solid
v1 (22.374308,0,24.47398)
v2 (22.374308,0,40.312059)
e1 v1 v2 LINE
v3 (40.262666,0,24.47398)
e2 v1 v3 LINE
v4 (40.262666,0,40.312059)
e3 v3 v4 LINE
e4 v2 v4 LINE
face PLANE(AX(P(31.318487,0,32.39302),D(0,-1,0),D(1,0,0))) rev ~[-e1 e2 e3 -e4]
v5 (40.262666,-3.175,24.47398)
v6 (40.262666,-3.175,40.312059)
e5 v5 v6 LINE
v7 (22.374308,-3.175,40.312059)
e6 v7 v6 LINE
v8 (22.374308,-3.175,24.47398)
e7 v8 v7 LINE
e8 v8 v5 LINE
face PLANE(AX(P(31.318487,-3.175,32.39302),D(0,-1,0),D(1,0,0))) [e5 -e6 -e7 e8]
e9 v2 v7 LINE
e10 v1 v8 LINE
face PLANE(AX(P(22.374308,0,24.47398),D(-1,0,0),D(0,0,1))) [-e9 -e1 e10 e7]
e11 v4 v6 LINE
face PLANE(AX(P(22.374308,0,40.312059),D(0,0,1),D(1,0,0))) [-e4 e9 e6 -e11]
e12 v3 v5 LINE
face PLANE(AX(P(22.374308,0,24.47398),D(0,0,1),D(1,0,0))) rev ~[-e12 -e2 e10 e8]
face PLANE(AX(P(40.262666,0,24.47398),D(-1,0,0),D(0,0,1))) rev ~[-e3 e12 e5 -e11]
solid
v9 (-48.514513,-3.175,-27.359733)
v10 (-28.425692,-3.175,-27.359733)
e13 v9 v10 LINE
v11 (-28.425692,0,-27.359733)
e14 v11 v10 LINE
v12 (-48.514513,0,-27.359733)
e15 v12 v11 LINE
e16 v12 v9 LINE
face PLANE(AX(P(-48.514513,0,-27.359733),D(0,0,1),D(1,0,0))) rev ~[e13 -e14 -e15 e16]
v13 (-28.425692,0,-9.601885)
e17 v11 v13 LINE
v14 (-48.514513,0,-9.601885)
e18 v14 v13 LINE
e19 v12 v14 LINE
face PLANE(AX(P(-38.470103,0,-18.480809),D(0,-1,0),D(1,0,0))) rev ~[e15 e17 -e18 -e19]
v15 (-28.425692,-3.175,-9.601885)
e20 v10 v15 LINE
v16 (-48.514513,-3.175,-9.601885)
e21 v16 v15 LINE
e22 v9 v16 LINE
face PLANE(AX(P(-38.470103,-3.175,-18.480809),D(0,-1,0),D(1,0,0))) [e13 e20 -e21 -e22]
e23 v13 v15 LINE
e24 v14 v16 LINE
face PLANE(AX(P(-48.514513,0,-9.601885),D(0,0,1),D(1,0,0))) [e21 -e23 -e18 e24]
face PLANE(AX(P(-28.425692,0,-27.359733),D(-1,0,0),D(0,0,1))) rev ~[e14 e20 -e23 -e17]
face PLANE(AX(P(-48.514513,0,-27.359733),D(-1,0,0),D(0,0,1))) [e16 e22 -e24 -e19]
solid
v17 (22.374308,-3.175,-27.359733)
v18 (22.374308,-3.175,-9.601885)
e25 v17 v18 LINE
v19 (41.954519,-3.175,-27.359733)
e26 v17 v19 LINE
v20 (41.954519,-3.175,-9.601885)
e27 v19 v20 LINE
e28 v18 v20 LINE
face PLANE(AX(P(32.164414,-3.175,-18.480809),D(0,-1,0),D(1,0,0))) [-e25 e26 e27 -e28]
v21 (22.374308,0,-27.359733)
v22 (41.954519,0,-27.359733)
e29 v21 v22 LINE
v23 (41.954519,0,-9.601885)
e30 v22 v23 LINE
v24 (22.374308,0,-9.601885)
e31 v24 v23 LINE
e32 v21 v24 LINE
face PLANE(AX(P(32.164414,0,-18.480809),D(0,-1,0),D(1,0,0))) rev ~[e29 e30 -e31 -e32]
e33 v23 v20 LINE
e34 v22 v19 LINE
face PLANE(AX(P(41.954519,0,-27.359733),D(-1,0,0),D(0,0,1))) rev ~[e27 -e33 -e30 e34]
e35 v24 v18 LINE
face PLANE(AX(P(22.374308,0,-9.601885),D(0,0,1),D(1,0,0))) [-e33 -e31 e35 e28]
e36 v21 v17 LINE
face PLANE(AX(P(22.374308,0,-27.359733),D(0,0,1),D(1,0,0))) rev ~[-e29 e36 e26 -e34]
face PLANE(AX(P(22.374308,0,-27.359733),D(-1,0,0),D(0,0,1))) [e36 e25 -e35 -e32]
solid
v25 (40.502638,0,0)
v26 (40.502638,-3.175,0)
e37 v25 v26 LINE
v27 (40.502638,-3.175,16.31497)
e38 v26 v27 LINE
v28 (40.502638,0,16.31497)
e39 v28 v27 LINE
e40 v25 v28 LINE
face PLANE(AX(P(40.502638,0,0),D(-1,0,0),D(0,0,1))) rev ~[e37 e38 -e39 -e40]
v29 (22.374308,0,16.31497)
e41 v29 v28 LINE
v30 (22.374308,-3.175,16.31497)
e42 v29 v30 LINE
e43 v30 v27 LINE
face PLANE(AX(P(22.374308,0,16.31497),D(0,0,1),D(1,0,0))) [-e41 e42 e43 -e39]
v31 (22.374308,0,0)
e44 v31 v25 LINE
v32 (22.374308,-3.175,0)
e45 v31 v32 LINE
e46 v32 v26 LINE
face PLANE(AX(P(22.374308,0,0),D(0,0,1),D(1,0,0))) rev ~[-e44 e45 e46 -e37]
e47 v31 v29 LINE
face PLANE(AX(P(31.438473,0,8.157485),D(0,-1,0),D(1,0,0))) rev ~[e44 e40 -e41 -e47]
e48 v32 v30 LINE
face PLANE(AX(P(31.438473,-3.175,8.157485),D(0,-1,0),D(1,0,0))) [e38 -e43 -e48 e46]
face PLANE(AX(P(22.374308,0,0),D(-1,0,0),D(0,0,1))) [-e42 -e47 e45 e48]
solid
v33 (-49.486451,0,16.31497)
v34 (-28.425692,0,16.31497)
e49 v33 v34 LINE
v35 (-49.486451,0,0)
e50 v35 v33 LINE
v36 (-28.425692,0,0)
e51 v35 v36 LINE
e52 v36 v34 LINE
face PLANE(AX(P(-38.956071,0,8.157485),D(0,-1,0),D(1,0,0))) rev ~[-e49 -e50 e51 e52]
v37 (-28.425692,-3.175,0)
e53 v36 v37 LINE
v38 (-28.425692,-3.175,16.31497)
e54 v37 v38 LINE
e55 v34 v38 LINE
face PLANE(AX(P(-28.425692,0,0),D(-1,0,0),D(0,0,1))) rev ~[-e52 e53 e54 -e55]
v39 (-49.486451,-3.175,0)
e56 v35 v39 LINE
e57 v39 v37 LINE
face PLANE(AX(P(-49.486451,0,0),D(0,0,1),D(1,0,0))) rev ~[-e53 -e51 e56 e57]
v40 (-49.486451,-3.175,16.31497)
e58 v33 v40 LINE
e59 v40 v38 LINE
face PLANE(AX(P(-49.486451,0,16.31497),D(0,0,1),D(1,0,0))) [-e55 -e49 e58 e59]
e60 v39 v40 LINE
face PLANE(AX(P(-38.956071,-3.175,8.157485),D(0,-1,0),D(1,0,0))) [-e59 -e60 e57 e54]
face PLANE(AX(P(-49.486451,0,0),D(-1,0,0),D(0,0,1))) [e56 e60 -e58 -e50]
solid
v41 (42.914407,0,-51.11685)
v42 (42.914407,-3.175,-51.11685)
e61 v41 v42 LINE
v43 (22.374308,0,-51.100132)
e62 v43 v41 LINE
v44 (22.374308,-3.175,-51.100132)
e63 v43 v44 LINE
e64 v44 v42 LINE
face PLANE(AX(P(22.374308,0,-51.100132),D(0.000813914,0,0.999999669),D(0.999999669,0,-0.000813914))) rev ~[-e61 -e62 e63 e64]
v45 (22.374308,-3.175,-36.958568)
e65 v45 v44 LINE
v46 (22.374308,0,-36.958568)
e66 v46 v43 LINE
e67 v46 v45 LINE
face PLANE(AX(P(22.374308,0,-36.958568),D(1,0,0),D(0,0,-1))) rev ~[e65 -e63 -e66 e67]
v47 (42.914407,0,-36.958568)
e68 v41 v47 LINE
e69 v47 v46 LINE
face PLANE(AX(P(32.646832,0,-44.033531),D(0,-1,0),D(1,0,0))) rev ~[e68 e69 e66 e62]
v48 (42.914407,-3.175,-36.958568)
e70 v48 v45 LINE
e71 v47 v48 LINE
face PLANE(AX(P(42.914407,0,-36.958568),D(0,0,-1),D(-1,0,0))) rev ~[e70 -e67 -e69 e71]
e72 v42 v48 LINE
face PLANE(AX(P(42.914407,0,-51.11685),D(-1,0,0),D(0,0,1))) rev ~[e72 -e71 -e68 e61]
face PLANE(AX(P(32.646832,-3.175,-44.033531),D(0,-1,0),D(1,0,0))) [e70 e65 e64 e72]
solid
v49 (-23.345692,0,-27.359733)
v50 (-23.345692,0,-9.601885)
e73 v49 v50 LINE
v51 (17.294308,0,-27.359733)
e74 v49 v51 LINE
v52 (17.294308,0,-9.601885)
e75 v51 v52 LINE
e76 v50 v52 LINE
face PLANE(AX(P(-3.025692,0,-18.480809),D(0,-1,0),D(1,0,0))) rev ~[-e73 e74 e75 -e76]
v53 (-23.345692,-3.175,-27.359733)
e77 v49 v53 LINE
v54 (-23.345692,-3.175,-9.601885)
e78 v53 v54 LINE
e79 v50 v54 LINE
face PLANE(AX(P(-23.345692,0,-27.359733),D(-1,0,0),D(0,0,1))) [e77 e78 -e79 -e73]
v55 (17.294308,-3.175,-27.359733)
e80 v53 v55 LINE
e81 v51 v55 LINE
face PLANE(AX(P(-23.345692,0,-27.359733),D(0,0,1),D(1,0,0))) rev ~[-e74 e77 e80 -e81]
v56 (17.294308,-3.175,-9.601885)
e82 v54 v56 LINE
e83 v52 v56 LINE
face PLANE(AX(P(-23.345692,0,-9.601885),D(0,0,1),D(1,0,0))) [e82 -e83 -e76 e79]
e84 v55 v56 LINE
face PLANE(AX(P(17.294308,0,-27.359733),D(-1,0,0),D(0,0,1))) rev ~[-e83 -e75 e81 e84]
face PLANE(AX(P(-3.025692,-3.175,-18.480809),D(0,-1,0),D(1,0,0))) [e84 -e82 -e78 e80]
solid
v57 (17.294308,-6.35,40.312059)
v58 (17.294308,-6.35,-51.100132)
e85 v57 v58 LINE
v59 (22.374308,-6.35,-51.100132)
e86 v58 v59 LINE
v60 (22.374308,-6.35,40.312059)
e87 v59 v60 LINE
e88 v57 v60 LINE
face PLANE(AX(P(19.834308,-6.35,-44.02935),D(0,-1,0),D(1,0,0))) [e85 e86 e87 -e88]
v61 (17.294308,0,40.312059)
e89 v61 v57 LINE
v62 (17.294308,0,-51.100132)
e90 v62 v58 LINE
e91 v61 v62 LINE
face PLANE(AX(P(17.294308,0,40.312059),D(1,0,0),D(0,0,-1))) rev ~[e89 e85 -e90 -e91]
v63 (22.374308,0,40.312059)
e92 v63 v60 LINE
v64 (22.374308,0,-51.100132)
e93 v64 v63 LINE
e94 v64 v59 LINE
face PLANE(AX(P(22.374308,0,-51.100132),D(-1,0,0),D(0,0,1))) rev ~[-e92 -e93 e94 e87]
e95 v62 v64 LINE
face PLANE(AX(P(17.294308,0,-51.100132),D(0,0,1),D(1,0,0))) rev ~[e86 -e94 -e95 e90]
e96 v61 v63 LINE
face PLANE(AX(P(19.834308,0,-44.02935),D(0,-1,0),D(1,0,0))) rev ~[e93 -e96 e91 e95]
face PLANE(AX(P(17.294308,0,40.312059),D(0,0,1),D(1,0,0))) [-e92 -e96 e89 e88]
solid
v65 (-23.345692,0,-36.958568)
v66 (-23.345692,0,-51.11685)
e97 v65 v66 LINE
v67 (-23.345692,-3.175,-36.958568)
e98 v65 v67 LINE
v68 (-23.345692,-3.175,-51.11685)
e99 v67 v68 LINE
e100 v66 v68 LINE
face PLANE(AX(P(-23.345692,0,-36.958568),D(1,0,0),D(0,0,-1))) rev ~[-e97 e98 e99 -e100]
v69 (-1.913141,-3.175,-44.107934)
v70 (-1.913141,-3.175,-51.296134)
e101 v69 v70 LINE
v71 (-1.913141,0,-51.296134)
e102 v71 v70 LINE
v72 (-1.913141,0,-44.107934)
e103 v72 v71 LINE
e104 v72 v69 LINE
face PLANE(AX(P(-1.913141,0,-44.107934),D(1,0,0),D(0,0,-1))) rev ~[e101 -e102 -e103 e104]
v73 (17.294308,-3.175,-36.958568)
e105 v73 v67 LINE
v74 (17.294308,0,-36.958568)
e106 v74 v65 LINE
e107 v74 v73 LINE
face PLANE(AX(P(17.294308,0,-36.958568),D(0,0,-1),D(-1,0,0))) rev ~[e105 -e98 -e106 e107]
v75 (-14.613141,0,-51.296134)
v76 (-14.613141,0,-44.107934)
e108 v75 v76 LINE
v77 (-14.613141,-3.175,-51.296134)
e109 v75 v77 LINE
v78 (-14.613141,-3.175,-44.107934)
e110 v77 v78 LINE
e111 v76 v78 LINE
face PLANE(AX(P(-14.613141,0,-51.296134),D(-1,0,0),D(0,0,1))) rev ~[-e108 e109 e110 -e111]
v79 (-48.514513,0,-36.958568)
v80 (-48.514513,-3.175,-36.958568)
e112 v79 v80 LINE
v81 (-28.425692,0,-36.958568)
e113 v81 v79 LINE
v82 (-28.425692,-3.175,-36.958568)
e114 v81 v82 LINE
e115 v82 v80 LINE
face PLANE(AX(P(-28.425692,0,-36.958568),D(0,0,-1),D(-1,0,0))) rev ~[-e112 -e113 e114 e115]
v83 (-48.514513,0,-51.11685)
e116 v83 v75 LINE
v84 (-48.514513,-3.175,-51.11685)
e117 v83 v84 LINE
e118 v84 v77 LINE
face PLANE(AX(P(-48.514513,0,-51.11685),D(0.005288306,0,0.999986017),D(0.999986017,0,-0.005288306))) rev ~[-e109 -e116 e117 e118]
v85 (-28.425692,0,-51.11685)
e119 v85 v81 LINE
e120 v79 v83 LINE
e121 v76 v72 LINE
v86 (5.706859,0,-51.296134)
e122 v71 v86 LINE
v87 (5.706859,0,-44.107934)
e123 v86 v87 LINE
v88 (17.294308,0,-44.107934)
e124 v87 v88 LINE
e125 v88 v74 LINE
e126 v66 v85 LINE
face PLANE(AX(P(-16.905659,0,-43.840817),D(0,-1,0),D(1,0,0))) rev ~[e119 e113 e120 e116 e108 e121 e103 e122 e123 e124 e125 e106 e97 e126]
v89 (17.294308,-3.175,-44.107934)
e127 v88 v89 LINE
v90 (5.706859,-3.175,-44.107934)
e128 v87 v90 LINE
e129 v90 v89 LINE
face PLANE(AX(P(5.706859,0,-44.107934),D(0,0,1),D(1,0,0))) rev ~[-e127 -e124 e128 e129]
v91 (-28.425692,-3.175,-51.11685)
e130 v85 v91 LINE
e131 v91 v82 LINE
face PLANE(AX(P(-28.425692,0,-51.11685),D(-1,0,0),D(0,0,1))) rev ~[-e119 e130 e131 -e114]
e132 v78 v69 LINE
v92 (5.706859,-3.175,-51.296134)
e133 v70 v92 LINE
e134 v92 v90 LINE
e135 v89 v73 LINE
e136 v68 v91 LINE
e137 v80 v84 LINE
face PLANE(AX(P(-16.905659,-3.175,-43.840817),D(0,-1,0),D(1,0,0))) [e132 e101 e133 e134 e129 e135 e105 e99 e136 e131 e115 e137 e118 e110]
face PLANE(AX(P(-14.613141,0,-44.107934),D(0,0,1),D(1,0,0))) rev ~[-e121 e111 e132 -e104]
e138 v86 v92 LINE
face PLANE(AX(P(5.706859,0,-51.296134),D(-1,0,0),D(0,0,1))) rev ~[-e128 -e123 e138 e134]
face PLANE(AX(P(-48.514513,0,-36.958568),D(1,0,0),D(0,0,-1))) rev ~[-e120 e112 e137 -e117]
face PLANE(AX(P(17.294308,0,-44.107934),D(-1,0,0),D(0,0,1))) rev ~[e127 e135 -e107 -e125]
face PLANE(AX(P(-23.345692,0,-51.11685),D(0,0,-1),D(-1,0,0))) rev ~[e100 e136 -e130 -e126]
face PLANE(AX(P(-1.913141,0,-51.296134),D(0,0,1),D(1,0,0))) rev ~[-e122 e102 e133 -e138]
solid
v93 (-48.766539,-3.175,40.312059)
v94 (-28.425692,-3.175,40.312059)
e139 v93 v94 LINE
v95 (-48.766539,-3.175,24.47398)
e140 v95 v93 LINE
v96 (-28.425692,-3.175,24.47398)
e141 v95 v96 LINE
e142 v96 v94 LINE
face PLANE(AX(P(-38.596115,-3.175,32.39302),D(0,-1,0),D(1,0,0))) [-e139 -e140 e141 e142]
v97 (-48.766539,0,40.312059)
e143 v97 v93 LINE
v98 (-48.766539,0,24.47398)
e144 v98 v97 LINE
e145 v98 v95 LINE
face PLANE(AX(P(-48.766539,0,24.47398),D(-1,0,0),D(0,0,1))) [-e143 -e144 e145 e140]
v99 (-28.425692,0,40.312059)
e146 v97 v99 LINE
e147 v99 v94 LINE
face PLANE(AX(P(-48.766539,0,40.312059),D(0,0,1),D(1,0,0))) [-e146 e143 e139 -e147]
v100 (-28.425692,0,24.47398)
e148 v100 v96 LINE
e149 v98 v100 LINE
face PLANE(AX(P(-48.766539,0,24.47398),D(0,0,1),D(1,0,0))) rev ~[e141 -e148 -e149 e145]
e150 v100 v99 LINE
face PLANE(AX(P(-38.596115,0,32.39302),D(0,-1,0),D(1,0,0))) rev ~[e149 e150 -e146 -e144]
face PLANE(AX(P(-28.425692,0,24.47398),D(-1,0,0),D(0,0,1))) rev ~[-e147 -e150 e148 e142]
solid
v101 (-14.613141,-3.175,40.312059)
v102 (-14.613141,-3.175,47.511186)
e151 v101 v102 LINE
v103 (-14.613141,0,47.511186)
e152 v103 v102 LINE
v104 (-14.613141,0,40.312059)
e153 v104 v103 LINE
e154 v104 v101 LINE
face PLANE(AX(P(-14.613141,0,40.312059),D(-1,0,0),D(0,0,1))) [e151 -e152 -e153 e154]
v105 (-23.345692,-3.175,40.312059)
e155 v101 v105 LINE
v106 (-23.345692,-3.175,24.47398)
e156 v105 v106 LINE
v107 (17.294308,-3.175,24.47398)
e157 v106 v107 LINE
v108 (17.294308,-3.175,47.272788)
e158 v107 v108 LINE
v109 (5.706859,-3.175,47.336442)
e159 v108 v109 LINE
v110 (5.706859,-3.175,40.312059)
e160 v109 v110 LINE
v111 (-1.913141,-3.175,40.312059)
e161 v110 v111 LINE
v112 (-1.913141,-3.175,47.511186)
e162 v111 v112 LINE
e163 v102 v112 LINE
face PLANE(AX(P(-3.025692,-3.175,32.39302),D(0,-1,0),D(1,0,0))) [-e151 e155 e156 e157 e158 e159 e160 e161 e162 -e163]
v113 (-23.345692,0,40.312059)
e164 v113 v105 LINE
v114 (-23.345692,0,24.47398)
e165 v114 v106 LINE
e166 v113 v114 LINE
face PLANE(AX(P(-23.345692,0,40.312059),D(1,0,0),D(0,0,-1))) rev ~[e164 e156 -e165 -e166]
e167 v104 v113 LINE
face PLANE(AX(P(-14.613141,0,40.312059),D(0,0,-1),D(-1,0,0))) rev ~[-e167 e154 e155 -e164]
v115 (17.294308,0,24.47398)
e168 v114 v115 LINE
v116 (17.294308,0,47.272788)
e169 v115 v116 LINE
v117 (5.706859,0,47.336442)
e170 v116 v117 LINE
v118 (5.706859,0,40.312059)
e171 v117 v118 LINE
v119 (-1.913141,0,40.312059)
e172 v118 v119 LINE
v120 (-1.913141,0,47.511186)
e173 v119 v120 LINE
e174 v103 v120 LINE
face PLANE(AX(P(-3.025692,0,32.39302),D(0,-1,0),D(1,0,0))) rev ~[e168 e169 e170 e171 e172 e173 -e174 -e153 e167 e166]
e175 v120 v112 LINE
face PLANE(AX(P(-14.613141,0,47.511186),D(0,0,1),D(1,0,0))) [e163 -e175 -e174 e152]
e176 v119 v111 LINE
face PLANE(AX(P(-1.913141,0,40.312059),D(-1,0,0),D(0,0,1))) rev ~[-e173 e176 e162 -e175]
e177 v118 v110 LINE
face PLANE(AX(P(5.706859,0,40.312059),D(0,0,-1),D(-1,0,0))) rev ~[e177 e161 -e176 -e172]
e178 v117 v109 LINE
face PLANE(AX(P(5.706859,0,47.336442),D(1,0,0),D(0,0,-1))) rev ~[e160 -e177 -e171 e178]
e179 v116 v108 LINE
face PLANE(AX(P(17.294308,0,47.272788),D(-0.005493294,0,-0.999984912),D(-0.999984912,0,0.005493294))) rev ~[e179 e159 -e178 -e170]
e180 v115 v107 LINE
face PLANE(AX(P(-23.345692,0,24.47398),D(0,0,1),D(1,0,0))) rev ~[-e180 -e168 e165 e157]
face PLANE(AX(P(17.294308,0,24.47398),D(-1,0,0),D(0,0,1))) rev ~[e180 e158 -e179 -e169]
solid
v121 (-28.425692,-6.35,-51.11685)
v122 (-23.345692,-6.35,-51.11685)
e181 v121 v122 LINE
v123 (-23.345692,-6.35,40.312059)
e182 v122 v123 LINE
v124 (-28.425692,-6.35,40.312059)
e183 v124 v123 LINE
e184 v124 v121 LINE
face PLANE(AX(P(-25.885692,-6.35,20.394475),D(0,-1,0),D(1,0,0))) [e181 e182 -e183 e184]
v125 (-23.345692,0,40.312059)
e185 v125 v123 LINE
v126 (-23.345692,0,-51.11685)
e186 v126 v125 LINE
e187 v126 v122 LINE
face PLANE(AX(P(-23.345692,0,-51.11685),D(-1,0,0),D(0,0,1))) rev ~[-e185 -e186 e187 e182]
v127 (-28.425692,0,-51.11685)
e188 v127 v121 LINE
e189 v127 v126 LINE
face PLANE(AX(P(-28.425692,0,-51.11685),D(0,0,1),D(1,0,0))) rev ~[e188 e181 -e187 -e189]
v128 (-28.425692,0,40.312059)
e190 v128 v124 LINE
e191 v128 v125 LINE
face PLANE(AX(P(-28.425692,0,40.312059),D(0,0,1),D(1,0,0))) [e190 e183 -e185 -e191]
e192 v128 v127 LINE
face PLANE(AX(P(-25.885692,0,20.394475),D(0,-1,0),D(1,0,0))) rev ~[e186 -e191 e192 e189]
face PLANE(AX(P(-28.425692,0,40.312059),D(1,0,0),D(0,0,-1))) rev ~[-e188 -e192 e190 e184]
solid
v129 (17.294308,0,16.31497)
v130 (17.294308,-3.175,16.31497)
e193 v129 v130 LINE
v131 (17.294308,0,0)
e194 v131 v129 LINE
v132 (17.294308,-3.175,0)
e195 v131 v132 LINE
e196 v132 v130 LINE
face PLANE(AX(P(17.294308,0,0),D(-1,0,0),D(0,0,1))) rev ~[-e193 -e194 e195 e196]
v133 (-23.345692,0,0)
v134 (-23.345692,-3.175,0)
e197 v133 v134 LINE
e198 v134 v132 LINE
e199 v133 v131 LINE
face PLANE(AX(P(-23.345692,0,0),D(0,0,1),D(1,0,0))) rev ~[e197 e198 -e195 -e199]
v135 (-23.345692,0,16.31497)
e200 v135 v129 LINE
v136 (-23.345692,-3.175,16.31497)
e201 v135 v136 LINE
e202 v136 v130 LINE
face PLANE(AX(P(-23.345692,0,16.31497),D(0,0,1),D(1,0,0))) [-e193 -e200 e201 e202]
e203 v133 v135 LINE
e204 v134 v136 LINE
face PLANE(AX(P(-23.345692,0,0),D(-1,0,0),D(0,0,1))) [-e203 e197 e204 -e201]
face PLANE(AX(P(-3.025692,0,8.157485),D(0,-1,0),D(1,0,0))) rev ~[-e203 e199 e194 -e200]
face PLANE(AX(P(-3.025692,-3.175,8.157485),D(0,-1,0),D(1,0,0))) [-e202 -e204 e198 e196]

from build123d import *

# Parameters (mm, degrees)
F0_W     = 12.7
F0_H     = 7.1991272271
F1_DEPTH = 3.175
F0_W_2   = 40.64
F0_H_2   = 16.3149703294
F0_H_3   = 17.7578479052
F0_W_3   = 20.0888210887
F0_W_4   = 21.0607587677
F0_W_5   = 20.3408464175
F0_H_4   = 15.8380791545
F0_W_6   = 17.8883576828
F0_W_7   = 18.128329708
F0_W_8   = 19.5802114373
F0_W_9   = 5.08
F0_H_5   = 8.1590097398
F0_H_6   = 9.6018854529
F0_H_7   = 9.5988344401
F0_H_8   = 14.158282429
F2_DEPTH = 6.35


# Not quite as in the source:
# - a feature names something its author has since deleted; it is built from what else it names


with BuildPart() as f1:
    # F0 (on Front) → F1 (new body)
    with BuildSketch(Plane.XZ):
        Polygon((-14.6131411788, 40.3120592237), (-23.3456920832, 40.3120592237), (-23.3456920832, 24.4739800692), (17.2943079168, 24.4739800692), (17.2943079168, 40.3120592237), (5.7068588212, 40.3120592237), (-1.9131411788, 40.3120592237), align=None)
        with Locations((-8.2631411788, 43.9116228372)):
            Rectangle(F0_W, F0_H)
        Polygon((5.7068588212, 40.3120592237), (17.2943079168, 40.3120592237), (17.2943079168, 47.2727881546), (5.7068588212, 47.3364423823), align=None)
    extrude(amount=F1_DEPTH)


with BuildPart() as f1b:
    # F0 (on Front) → F1, piece 2 (new body)
    with BuildSketch(Plane.XZ):
        with Locations((-3.0256920832, 8.1574851647)):
            Rectangle(F0_W_2, F0_H_2)
    extrude(amount=F1_DEPTH)


with BuildPart() as f1c:
    # F0 (on Front) → F1, piece 3 (new body)
    with BuildSketch(Plane.XZ):
        with Locations((-3.0256920832, -18.4808094054)):
            Rectangle(F0_W_2, F0_H_3)
    extrude(amount=F1_DEPTH)


with BuildPart() as f1d:
    # F0 (on Front) → F1, piece 4 (new body)
    with BuildSketch(Plane.XZ):
        Polygon((-28.4256920832, -51.1168502271), (-28.4256920832, -36.9585677981), (-48.5145131719, -36.9585677981), (-48.5145131719, -51.1168502271), (-14.6131411788, -51.296133548), (-14.6131411788, -44.107933548), (-1.9131411788, -44.107933548), (-1.9131411788, -51.296133548), (5.7068588212, -51.296133548), (5.7068588212, -44.107933548), (17.2943079168, -44.107933548), (17.2943079168, -36.9585677981), (-23.3456920832, -36.9585677981), (-23.3456920832, -51.1168502271), align=None)
    extrude(amount=F1_DEPTH)


with BuildPart() as f1e:
    # F0 (on Front) → F1, piece 5 (new body)
    with BuildSketch(Plane.XZ):
        with Locations((-38.4701026276, -18.4808094054)):
            Rectangle(F0_W_3, F0_H_3)
    extrude(amount=F1_DEPTH)


with BuildPart() as f1f:
    # F0 (on Front) → F1, piece 6 (new body)
    with BuildSketch(Plane.XZ):
        with Locations((-38.9560714671, 8.1574851647)):
            Rectangle(F0_W_4, F0_H_2)
    extrude(amount=F1_DEPTH)


with BuildPart() as f1g:
    # F0 (on Front) → F1, piece 7 (new body)
    with BuildSketch(Plane.XZ):
        with Locations((-38.596115292, 32.3930196464)):
            Rectangle(F0_W_5, F0_H_4)
    extrude(amount=F1_DEPTH)


with BuildPart() as f1h:
    # F0 (on Front) → F1, piece 8 (new body)
    with BuildSketch(Plane.XZ):
        with Locations((31.3184867582, 32.3930196464)):
            Rectangle(F0_W_6, F0_H_4)
    extrude(amount=F1_DEPTH)


with BuildPart() as f1i:
    # F0 (on Front) → F1, piece 9 (new body)
    with BuildSketch(Plane.XZ):
        with Locations((31.4384727708, 8.1574851647)):
            Rectangle(F0_W_7, F0_H_2)
    extrude(amount=F1_DEPTH)


with BuildPart() as f1j:
    # F0 (on Front) → F1, piece 10 (new body)
    with BuildSketch(Plane.XZ):
        with Locations((32.1644136354, -18.4808094054)):
            Rectangle(F0_W_8, F0_H_3)
    extrude(amount=F1_DEPTH)


with BuildPart() as f1k:
    # F0 (on Front) → F1, piece 11 (new body)
    with BuildSketch(Plane.XZ):
        Polygon((42.9144074547, -36.9585677981), (22.3743079168, -36.9585677981), (22.3743079168, -51.1001323521), (42.9144074547, -51.1168502271), align=None)
    extrude(amount=F1_DEPTH)


with BuildPart() as f2:
    # F0 (on Front) → F2 (new body)
    with BuildSketch(Plane.XZ):
        with Locations((-25.8856920832, 20.3944751993)):
            Rectangle(F0_W_9, F0_H_5)
        with Locations((-25.8856920832, 32.3930196464)):
            Rectangle(F0_W_9, F0_H_4)
        with Locations((-25.8856920832, 8.1574851647)):
            Rectangle(F0_W_9, F0_H_2)
        with Locations((-25.8856920832, -4.8009427264)):
            Rectangle(F0_W_9, F0_H_6)
        with Locations((-25.8856920832, -18.4808094054)):
            Rectangle(F0_W_9, F0_H_3)
        with Locations((-25.8856920832, -32.1591505781)):
            Rectangle(F0_W_9, F0_H_7)
        with Locations((-25.8856920832, -44.0377090126)):
            Rectangle(F0_W_9, F0_H_8)
    extrude(amount=F2_DEPTH)


with BuildPart() as f2b:
    # F0 (on Front) → F2, piece 2 (new body)
    with BuildSketch(Plane.XZ):
        Polygon((22.3743079168, -36.9585677981), (17.2943079168, -36.9585677981), (17.2943079168, -44.107933548), (17.2943079168, -51.1001323521), (22.3743079168, -51.1001323521), align=None)
        with Locations((19.8343079168, -32.1591505781)):
            Rectangle(F0_W_9, F0_H_7)
        with Locations((19.8343079168, -18.4808094054)):
            Rectangle(F0_W_9, F0_H_3)
        with Locations((19.8343079168, -4.8009427264)):
            Rectangle(F0_W_9, F0_H_6)
        with Locations((19.8343079168, 8.1574851647)):
            Rectangle(F0_W_9, F0_H_2)
        with Locations((19.8343079168, 20.3944751993)):
            Rectangle(F0_W_9, F0_H_5)
        with Locations((19.8343079168, 32.3930196464)):
            Rectangle(F0_W_9, F0_H_4)
    extrude(amount=F2_DEPTH)


solid = Compound([f1.part, f1b.part, f1c.part, f1d.part, f1e.part, f1f.part, f1g.part, f1h.part, f1i.part, f1j.part, f1k.part, f2.part, f2b.part])
